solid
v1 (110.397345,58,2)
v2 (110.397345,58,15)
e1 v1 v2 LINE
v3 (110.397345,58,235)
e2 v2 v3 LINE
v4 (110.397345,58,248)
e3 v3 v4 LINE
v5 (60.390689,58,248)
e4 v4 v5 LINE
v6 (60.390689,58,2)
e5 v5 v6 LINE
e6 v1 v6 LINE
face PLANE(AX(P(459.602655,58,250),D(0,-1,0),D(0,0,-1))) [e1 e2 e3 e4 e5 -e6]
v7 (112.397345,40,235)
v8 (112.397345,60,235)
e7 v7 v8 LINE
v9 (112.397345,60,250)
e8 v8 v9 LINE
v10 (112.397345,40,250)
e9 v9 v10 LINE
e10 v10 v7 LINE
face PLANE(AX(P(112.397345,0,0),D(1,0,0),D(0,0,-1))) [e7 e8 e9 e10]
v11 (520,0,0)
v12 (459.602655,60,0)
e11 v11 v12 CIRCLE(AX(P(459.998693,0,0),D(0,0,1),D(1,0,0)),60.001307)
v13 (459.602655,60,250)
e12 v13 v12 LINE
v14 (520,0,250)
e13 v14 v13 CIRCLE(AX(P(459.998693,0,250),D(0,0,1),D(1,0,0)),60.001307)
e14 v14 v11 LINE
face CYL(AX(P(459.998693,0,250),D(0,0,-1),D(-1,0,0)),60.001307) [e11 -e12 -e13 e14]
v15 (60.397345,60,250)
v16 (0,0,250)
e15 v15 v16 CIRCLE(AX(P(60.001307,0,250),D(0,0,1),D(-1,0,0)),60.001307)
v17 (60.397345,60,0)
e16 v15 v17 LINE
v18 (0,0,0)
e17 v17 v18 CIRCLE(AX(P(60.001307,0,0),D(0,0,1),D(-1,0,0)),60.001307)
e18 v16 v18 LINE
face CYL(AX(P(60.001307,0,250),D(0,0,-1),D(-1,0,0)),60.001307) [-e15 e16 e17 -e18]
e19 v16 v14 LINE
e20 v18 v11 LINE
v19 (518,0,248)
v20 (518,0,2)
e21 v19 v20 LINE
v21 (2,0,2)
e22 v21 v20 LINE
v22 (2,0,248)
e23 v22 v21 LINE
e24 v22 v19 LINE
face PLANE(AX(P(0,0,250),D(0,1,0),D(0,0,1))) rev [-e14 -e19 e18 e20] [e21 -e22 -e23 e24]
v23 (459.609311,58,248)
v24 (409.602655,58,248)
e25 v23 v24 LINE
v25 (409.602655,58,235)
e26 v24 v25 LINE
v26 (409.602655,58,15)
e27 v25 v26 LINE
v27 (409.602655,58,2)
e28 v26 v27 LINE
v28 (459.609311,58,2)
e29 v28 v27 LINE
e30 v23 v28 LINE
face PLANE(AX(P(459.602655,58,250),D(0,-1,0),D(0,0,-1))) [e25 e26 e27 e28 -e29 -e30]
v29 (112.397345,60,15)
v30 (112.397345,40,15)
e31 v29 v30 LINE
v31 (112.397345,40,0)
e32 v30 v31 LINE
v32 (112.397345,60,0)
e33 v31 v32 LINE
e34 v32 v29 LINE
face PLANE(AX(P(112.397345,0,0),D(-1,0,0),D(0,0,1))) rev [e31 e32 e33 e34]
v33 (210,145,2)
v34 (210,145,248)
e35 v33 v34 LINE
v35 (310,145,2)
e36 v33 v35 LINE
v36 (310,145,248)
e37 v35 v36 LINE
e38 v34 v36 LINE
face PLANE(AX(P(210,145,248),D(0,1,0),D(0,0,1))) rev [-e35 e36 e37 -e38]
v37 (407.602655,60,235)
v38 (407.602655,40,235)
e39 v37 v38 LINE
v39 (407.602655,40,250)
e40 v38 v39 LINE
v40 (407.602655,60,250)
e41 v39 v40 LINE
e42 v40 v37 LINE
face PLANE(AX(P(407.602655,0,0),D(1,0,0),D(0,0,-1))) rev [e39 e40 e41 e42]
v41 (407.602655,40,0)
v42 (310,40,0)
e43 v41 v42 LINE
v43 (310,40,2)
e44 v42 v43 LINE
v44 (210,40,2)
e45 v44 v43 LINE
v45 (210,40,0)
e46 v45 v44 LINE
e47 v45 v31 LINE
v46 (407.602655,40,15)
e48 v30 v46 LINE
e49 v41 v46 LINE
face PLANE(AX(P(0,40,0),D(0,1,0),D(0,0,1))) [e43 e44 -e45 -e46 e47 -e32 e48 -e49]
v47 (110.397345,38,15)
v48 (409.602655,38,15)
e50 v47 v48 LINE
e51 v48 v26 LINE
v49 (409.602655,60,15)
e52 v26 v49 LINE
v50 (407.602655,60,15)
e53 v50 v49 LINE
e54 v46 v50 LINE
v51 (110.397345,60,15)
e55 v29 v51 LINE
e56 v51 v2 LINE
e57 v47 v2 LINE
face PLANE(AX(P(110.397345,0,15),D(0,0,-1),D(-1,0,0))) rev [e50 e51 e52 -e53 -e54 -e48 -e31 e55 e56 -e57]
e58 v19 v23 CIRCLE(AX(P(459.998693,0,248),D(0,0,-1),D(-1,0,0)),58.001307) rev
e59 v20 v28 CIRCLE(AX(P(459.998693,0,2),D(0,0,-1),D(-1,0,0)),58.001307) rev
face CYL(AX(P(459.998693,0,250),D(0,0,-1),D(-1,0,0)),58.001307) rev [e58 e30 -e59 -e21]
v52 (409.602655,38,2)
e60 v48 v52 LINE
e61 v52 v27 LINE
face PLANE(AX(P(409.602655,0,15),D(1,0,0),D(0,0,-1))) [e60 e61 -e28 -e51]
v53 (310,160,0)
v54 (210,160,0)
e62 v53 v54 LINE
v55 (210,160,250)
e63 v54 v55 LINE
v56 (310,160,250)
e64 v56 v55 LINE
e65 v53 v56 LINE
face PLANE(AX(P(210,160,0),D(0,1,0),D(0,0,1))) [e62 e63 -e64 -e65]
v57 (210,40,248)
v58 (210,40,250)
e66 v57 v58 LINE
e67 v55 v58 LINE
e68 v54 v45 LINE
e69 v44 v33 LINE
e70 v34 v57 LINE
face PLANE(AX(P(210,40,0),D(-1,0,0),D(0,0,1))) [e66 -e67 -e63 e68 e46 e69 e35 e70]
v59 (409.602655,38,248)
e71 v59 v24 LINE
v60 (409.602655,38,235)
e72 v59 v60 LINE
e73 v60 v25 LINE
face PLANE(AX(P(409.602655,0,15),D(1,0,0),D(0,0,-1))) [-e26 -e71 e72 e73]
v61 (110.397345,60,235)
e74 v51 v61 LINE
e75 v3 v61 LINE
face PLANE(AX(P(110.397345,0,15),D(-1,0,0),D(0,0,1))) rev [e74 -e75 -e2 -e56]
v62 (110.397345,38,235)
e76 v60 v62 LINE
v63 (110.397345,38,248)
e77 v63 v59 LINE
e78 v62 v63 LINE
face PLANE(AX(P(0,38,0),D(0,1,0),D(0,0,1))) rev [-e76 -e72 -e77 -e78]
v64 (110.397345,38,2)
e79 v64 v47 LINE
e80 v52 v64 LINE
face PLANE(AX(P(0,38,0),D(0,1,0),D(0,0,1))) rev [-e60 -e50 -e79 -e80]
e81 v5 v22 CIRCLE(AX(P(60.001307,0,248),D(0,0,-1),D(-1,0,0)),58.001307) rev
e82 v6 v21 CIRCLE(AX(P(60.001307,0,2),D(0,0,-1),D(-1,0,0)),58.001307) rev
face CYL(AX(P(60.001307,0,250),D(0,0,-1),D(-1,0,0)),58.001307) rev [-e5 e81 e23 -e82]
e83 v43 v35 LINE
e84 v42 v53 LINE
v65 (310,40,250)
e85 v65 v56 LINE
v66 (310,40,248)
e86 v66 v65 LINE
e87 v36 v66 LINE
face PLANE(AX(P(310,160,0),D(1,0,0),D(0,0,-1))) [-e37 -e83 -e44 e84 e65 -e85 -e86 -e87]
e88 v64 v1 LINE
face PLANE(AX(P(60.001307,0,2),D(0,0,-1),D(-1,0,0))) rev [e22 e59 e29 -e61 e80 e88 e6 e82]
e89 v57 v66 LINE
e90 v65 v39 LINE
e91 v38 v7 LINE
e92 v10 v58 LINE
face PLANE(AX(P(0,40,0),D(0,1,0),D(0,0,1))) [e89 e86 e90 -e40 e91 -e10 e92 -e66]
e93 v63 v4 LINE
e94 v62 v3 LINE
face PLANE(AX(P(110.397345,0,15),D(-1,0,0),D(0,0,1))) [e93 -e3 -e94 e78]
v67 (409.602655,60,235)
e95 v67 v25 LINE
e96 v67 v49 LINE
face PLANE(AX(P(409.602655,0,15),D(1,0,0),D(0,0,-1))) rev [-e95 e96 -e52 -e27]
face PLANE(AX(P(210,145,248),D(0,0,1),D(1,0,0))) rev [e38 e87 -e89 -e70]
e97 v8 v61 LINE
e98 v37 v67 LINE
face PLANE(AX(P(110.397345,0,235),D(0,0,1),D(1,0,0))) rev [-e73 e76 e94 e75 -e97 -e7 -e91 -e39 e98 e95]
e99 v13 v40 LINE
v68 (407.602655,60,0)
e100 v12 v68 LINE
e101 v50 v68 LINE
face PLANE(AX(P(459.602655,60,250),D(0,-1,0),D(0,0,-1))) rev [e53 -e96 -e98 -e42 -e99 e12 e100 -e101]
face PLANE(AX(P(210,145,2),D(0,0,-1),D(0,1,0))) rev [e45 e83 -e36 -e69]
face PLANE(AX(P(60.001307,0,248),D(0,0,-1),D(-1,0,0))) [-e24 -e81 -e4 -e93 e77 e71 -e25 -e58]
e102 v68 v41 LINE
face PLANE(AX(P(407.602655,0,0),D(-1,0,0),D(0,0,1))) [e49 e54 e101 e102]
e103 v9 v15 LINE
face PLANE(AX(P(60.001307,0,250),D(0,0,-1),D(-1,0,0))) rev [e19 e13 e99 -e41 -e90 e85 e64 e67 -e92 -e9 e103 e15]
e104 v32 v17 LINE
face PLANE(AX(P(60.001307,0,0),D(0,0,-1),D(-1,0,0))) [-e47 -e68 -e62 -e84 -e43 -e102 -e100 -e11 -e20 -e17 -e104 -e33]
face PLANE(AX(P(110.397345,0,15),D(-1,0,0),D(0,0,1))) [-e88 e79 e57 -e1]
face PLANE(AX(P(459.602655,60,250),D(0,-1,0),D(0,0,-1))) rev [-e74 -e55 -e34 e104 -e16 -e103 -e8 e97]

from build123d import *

# Parameters (mm, degrees)
BOSS_EXTRUDE1_DEPTH = 250
SKETCH2_W           = 299.205309142
SKETCH2_H           = 220
CUT_EXTRUDE1_DEPTH  = 581.086200491
SKETCH4_W           = 299.205309142
SKETCH4_H           = 15
CUT_EXTRUDE2_DEPTH  = 20
SHELL1_START        = 2
SHELL1_DEPTH        = 246
SKETCH5_W           = 15
SKETCH5_H           = 20
BOSS_EXTRUDE2_DEPTH = 2
SKETCH6_W           = 15
SKETCH6_H           = 20
BOSS_EXTRUDE3_DEPTH = 2
SKETCH7_W           = 100
SKETCH7_H           = 120
BOSS_EXTRUDE4_DEPTH = 250
CUT_EXTRUDE3_DEPTH  = 100


# Read off the part's stored shape, not the designer's step: Shell1
with BuildPart() as part:
    # Sketch1 → Boss-Extrude1 (new body)
    with BuildSketch(Plane.XY):
        with BuildLine():
            Line((0, 0), (520, 0))
            ThreePointArc((520, 0), (502.285771516, 42.567121511), (459.602654571, 60))
            Line((459.602654571, 60), (60.397345429, 60))
            ThreePointArc((60.397345429, 60), (17.714228484, 42.567121511), (0, 0))
        make_face()
    extrude(amount=BOSS_EXTRUDE1_DEPTH)

    # Sketch2 → Cut-Extrude1 (cut, through all)
    with BuildSketch(Plane(origin=(0, 60, 0), x_dir=(1, 0, 0), z_dir=(0, 1, 0))):
        with Locations((260, -125)):
            Rectangle(SKETCH2_W, SKETCH2_H)
    extrude(amount=-CUT_EXTRUDE1_DEPTH, mode=Mode.SUBTRACT)

    # Sketch4 → Cut-Extrude2 (cut)
    with BuildSketch(Plane(origin=(0, 60, 0), x_dir=(1, 0, 0), z_dir=(0, 1, 0))):
        with Locations((260, -242.5)):
            Rectangle(SKETCH4_W, SKETCH4_H)
        with Locations((260, -7.5)):
            Rectangle(SKETCH4_W, SKETCH4_H)
    extrude(amount=-CUT_EXTRUDE2_DEPTH, mode=Mode.SUBTRACT)

    # Shell1 outline → Shell1 (cut)
    with BuildSketch(Plane.XY.offset(SHELL1_START)):
        with BuildLine():
            Line((110.397345429, 38), (110.397345429, 58))
            Line((110.397345429, 58), (60.390688921, 58))
            ThreePointArc((60.390688921, 58), (19.126088629, 41.15055453), (2, 0))
            Line((2, 0), (518, 0))
            ThreePointArc((518, 0), (500.873911371, 41.15055453), (459.609311079, 58))
            Line((459.609311079, 58), (409.602654571, 58))
            Line((409.602654571, 58), (409.602654571, 38))
            Line((409.602654571, 38), (110.397345429, 38))
        make_face()
    extrude(amount=SHELL1_DEPTH, mode=Mode.SUBTRACT)

    # Sketch5 → Boss-Extrude2 (add)
    with BuildSketch(Plane.ZY.offset(-409.602654571)):
        with Locations((7.5, 50)):
            Rectangle(SKETCH5_W, SKETCH5_H)
        with Locations((242.5, 50)):
            Rectangle(SKETCH5_W, SKETCH5_H)
    extrude(amount=BOSS_EXTRUDE2_DEPTH)

    # Sketch6 → Boss-Extrude3 (add)
    with BuildSketch(Plane(origin=(110.397345429, 0, 0), x_dir=(0, 0, -1), z_dir=(1, 0, 0))):
        with Locations((-242.5, 50)):
            Rectangle(SKETCH6_W, SKETCH6_H)
        with Locations((-7.5, 50)):
            Rectangle(SKETCH6_W, SKETCH6_H)
    extrude(amount=BOSS_EXTRUDE3_DEPTH)

    # Sketch7 → Boss-Extrude4 (add)
    with BuildSketch(Plane.XY.offset(250)):
        with Locations((260, 100)):
            Rectangle(SKETCH7_W, SKETCH7_H)
    extrude(amount=-BOSS_EXTRUDE4_DEPTH)

    # Sketch8 → Cut-Extrude3 (cut)
    with BuildSketch(Plane(origin=(310, 0, 0), x_dir=(0, 0, -1), z_dir=(1, 0, 0))):
        Polygon((-248, 145), (-2, 145), (-2, 40), (-15, 40), (-235, 40), (-248, 40), align=None)
    extrude(amount=-CUT_EXTRUDE3_DEPTH, mode=Mode.SUBTRACT)


solid = part.part
